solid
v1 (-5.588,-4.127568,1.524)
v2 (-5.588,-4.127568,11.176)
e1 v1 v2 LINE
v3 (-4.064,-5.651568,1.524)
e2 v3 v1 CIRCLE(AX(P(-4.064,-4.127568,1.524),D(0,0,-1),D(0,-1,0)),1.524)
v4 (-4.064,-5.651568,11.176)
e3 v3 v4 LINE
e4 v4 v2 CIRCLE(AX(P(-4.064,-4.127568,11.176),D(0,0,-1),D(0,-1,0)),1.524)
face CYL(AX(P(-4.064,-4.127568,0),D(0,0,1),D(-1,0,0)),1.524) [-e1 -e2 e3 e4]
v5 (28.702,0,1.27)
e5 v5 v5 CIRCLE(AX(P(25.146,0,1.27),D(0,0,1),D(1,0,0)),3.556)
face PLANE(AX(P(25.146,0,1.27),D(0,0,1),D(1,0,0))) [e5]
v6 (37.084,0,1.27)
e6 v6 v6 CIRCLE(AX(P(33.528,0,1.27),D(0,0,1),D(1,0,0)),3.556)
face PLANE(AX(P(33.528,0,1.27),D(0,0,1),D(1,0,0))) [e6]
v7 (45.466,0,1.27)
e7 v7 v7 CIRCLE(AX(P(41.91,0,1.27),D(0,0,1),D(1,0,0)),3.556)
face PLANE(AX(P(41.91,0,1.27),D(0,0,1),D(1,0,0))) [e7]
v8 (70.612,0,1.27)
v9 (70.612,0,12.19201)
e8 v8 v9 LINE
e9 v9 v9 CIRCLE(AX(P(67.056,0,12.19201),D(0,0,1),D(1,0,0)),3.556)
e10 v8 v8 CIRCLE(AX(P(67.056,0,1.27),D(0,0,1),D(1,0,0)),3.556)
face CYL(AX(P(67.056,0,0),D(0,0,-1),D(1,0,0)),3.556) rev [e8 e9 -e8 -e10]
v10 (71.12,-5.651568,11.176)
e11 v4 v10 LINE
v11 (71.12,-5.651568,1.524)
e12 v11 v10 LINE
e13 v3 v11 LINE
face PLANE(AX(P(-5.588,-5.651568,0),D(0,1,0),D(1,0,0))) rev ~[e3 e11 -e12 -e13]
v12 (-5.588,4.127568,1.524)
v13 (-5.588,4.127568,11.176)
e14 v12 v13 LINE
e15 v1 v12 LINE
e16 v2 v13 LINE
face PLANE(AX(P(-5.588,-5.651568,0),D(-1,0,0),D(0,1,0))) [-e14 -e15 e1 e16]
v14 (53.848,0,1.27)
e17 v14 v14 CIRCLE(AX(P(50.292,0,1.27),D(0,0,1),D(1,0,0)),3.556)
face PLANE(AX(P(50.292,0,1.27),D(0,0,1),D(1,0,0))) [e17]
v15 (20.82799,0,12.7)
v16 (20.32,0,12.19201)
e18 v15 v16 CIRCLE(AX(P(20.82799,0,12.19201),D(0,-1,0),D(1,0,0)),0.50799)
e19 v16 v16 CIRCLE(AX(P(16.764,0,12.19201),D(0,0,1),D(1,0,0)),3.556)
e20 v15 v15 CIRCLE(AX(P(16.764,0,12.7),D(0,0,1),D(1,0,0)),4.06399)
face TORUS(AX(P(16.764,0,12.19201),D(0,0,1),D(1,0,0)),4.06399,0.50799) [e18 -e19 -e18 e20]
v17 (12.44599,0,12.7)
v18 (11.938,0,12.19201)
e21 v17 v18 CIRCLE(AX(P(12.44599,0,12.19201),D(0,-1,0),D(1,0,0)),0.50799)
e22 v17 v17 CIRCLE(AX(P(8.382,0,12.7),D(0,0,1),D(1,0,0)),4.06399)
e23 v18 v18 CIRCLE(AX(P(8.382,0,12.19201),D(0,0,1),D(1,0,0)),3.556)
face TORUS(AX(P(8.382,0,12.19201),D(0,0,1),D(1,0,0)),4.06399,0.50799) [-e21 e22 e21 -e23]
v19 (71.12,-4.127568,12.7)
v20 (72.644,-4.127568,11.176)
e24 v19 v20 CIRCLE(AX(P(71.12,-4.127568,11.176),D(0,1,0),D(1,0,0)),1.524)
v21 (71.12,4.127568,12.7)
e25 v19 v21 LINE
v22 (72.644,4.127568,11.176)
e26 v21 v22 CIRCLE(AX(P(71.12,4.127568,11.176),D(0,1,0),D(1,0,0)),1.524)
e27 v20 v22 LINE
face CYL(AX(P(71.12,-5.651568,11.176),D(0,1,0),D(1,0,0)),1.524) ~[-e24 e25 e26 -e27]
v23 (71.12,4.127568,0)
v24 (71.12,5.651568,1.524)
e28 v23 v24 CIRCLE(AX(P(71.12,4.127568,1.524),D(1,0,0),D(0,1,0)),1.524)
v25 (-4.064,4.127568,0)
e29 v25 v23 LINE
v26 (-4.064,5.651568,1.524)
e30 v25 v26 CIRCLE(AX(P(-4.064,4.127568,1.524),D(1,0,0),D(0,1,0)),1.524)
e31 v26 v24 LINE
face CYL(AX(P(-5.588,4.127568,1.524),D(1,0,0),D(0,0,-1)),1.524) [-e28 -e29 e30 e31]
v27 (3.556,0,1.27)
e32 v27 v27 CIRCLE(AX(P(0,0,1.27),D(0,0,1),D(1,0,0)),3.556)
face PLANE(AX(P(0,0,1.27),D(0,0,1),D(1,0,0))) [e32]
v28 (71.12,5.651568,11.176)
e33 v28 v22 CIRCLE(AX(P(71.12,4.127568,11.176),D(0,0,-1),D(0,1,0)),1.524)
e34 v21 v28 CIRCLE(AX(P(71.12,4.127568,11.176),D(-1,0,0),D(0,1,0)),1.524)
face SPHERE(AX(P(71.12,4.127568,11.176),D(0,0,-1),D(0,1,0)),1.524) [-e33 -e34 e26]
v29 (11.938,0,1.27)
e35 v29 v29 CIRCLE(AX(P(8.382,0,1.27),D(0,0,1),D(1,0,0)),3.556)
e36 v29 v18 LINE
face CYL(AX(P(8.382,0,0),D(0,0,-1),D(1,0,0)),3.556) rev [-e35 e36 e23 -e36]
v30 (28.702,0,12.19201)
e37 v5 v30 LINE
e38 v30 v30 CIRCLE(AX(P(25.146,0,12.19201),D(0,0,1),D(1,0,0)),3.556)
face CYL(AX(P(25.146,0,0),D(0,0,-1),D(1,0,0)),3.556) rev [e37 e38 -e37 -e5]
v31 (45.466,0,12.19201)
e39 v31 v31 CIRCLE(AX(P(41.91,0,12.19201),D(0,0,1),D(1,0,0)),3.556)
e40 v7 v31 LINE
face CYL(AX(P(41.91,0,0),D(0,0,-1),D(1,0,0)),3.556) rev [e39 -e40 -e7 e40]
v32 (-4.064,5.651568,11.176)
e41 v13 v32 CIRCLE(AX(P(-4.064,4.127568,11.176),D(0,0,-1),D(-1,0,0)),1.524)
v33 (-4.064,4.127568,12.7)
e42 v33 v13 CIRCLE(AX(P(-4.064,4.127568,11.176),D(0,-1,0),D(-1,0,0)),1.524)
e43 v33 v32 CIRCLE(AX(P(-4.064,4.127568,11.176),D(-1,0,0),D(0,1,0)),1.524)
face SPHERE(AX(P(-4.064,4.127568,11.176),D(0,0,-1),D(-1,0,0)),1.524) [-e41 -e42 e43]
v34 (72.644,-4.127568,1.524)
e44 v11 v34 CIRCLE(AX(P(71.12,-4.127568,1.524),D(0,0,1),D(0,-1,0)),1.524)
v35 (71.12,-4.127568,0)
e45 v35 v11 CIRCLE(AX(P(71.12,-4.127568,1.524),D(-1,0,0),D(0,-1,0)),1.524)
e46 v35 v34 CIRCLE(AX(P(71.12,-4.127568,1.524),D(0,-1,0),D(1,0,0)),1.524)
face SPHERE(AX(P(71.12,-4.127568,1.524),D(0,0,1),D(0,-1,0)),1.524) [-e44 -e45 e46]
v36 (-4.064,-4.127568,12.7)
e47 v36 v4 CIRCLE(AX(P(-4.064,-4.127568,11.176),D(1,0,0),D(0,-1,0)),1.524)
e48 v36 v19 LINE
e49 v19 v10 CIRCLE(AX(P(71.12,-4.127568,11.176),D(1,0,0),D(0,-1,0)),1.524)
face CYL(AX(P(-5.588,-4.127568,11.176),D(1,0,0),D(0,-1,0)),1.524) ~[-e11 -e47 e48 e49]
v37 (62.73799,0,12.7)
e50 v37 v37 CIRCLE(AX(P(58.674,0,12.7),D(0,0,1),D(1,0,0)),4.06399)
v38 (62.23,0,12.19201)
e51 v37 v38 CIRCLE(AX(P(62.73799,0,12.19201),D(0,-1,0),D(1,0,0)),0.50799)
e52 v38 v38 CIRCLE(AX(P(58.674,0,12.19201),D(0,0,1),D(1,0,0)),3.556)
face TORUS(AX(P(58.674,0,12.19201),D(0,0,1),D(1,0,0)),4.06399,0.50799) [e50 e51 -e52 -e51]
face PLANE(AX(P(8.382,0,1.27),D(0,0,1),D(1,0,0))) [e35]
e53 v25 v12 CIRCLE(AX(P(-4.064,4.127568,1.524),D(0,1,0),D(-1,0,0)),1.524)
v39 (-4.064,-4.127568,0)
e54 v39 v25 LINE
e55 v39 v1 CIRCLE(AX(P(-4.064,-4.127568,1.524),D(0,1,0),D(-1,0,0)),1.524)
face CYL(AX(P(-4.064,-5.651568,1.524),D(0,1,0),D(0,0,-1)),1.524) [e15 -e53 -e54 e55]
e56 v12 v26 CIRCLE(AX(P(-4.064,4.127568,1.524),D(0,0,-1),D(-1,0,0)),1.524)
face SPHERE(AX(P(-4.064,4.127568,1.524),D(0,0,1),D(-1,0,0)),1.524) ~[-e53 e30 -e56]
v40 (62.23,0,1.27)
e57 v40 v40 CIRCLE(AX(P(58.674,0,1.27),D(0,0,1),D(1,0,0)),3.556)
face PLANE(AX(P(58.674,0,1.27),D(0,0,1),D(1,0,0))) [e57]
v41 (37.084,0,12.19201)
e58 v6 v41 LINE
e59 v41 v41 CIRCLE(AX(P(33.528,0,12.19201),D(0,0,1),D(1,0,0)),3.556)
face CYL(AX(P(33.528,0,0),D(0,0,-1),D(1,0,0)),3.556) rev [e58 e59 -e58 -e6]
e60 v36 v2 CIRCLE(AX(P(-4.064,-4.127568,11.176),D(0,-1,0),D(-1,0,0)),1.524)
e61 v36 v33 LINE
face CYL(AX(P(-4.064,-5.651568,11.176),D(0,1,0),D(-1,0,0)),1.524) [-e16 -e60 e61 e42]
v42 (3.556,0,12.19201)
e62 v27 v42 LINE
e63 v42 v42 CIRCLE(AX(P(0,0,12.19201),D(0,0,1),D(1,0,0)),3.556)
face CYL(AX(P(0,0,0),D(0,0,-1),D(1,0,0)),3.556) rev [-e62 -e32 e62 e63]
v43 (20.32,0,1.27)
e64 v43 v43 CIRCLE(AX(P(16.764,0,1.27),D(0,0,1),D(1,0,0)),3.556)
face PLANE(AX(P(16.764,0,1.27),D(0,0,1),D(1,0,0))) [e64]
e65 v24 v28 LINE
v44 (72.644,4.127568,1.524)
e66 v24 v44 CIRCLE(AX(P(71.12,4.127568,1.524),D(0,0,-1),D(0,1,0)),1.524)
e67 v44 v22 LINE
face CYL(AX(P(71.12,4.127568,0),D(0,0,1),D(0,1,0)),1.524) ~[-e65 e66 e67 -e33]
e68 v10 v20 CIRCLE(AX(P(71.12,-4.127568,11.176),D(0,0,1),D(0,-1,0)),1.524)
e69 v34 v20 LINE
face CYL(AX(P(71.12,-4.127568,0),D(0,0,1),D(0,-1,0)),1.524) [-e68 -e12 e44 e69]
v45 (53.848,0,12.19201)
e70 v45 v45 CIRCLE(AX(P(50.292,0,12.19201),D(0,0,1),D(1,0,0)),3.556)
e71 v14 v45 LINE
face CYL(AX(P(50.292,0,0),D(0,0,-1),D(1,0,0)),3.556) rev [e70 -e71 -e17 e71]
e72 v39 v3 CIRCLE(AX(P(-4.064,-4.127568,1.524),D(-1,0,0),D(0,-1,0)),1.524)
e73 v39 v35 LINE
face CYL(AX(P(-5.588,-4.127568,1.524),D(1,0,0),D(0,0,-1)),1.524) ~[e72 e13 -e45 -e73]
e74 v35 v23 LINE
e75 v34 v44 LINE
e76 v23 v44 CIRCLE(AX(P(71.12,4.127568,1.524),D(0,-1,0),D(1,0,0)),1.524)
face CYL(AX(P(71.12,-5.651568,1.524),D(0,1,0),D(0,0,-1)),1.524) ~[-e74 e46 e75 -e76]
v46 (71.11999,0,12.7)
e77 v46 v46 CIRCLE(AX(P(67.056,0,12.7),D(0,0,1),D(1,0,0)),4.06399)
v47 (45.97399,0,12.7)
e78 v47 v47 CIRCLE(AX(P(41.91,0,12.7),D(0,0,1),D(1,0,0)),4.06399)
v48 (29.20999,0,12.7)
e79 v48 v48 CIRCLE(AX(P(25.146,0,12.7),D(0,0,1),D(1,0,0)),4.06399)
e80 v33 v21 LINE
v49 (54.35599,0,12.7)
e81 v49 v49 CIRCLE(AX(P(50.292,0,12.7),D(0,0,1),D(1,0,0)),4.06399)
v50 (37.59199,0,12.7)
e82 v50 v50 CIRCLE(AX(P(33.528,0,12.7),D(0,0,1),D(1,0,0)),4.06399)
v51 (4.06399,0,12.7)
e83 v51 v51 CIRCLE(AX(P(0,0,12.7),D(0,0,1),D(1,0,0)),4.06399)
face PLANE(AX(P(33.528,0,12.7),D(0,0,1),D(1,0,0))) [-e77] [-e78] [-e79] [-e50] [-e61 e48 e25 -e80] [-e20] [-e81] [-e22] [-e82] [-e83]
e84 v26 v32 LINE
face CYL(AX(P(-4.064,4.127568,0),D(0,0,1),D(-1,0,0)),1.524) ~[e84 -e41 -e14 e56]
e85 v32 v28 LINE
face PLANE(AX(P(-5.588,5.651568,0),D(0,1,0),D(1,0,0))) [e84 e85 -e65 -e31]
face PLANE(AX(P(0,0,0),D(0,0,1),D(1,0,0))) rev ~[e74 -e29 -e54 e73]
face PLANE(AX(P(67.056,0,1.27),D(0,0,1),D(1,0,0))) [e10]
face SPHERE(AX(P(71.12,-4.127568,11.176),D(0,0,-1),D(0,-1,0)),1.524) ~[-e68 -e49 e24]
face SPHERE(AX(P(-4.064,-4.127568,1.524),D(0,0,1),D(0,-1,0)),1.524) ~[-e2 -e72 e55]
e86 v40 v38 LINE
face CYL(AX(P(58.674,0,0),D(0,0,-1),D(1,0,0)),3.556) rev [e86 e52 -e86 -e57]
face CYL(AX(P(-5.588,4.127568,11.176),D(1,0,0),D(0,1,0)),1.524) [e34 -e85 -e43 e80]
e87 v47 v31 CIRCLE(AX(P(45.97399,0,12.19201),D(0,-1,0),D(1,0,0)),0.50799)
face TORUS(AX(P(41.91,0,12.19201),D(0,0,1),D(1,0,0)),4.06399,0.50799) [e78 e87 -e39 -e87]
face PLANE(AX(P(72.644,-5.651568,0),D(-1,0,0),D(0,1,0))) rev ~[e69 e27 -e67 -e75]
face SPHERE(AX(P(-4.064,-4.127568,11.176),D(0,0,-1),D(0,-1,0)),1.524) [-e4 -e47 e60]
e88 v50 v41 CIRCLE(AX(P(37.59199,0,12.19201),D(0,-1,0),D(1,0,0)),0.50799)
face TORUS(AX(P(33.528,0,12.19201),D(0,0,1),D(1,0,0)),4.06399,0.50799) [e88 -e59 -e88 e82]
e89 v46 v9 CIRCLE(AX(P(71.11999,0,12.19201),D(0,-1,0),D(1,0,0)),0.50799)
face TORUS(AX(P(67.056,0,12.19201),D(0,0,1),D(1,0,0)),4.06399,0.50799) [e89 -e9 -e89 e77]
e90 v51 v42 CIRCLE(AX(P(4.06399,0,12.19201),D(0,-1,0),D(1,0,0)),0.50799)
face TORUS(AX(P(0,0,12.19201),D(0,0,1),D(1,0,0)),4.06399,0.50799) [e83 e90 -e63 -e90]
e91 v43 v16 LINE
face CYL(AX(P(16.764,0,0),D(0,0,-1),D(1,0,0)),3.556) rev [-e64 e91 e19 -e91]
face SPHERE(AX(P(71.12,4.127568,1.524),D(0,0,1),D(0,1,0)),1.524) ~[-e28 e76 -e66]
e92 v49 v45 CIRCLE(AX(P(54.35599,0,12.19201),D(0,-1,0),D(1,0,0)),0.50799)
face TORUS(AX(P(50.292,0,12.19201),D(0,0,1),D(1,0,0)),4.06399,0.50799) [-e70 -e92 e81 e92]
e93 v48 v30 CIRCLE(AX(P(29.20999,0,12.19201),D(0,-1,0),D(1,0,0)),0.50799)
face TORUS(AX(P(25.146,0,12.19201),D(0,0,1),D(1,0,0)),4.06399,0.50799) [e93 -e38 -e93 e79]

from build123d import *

# Parameters (mm, degrees)
F0_W     = 78.232
F0_H     = 11.3031361252
F0_R     = 3.556
F1_DEPTH = 12.7
F2_DEPTH = 1.27
F3_R     = 1.524
F4_R     = 0.50799


# Not quite as in the source:
# - a fillet or chamfer is up to 0.001 mm smaller than in the source, because OpenCascade refuses the exact size
# - a feature names something its author has since deleted; it is built from what else it names


with BuildPart() as f1:
    # F0 (on Top) → F1 (new body)
    with BuildSketch(Plane.XY):
        with Locations((33.528, 0)):
            Rectangle(F0_W, F0_H)
        Circle(F0_R, mode=Mode.SUBTRACT)
        with Locations((8.382, 0)):
            Circle(F0_R, mode=Mode.SUBTRACT)
        with Locations((16.764, 0)):
            Circle(F0_R, mode=Mode.SUBTRACT)
        with Locations((25.146, 0)):
            Circle(F0_R, mode=Mode.SUBTRACT)
        with Locations((33.528, 0)):
            Circle(F0_R, mode=Mode.SUBTRACT)
        with Locations((41.91, 0)):
            Circle(F0_R, mode=Mode.SUBTRACT)
        with Locations((50.292, 0)):
            Circle(F0_R, mode=Mode.SUBTRACT)
        with Locations((58.674, 0)):
            Circle(F0_R, mode=Mode.SUBTRACT)
        with Locations((67.056, 0)):
            Circle(F0_R, mode=Mode.SUBTRACT)
    extrude(amount=F1_DEPTH)

    # F0 (on Top) → F2 (join)
    with BuildSketch(Plane.XY):
        Circle(F0_R)
        with Locations((8.382, 0)):
            Circle(F0_R)
        with Locations((16.764, 0)):
            Circle(F0_R)
        with Locations((25.146, 0)):
            Circle(F0_R)
        with Locations((33.528, 0)):
            Circle(F0_R)
        with Locations((41.91, 0)):
            Circle(F0_R)
        with Locations((50.292, 0)):
            Circle(F0_R)
        with Locations((58.674, 0)):
            Circle(F0_R)
        with Locations((67.056, 0)):
            Circle(F0_R)
    extrude(amount=F2_DEPTH)

    # F3
    f3_edges = [f1.edges().sort_by_distance(p)[0] for p in [
        (-5.588, -5.651568, 6.35),
        (72.644, -5.651568, 6.35),
        (33.528, -5.651568, 0),
        (33.528, -5.651568, 12.7),
        (-5.588, 5.651568, 6.35),
        (-5.588, 0, 0),
        (-5.588, 0, 12.7),
        (72.644, 5.651568, 6.35),
        (33.528, 5.651568, 0),
        (33.528, 5.651568, 12.7),
        (72.644, 0, 0),
        (72.644, 0, 12.7),
    ]]
    fillet(f3_edges, radius=F3_R)

    # F4 (radius 0.508 in the source; OpenCascade refuses exactly that, so slightly less here)
    f4_edges = [f1.edges().sort_by_distance(p)[0] for p in [
        (-3.556, 0, 12.7),
        (63.5, 0, 12.7),
        (55.118, 0, 12.7),
        (38.354, 0, 12.7),
        (46.736, 0, 12.7),
        (29.972, 0, 12.7),
        (21.59, 0, 12.7),
        (13.208, 0, 12.7),
        (4.826, 0, 12.7),
    ]]
    fillet(f4_edges, radius=F4_R)


solid = f1.part
